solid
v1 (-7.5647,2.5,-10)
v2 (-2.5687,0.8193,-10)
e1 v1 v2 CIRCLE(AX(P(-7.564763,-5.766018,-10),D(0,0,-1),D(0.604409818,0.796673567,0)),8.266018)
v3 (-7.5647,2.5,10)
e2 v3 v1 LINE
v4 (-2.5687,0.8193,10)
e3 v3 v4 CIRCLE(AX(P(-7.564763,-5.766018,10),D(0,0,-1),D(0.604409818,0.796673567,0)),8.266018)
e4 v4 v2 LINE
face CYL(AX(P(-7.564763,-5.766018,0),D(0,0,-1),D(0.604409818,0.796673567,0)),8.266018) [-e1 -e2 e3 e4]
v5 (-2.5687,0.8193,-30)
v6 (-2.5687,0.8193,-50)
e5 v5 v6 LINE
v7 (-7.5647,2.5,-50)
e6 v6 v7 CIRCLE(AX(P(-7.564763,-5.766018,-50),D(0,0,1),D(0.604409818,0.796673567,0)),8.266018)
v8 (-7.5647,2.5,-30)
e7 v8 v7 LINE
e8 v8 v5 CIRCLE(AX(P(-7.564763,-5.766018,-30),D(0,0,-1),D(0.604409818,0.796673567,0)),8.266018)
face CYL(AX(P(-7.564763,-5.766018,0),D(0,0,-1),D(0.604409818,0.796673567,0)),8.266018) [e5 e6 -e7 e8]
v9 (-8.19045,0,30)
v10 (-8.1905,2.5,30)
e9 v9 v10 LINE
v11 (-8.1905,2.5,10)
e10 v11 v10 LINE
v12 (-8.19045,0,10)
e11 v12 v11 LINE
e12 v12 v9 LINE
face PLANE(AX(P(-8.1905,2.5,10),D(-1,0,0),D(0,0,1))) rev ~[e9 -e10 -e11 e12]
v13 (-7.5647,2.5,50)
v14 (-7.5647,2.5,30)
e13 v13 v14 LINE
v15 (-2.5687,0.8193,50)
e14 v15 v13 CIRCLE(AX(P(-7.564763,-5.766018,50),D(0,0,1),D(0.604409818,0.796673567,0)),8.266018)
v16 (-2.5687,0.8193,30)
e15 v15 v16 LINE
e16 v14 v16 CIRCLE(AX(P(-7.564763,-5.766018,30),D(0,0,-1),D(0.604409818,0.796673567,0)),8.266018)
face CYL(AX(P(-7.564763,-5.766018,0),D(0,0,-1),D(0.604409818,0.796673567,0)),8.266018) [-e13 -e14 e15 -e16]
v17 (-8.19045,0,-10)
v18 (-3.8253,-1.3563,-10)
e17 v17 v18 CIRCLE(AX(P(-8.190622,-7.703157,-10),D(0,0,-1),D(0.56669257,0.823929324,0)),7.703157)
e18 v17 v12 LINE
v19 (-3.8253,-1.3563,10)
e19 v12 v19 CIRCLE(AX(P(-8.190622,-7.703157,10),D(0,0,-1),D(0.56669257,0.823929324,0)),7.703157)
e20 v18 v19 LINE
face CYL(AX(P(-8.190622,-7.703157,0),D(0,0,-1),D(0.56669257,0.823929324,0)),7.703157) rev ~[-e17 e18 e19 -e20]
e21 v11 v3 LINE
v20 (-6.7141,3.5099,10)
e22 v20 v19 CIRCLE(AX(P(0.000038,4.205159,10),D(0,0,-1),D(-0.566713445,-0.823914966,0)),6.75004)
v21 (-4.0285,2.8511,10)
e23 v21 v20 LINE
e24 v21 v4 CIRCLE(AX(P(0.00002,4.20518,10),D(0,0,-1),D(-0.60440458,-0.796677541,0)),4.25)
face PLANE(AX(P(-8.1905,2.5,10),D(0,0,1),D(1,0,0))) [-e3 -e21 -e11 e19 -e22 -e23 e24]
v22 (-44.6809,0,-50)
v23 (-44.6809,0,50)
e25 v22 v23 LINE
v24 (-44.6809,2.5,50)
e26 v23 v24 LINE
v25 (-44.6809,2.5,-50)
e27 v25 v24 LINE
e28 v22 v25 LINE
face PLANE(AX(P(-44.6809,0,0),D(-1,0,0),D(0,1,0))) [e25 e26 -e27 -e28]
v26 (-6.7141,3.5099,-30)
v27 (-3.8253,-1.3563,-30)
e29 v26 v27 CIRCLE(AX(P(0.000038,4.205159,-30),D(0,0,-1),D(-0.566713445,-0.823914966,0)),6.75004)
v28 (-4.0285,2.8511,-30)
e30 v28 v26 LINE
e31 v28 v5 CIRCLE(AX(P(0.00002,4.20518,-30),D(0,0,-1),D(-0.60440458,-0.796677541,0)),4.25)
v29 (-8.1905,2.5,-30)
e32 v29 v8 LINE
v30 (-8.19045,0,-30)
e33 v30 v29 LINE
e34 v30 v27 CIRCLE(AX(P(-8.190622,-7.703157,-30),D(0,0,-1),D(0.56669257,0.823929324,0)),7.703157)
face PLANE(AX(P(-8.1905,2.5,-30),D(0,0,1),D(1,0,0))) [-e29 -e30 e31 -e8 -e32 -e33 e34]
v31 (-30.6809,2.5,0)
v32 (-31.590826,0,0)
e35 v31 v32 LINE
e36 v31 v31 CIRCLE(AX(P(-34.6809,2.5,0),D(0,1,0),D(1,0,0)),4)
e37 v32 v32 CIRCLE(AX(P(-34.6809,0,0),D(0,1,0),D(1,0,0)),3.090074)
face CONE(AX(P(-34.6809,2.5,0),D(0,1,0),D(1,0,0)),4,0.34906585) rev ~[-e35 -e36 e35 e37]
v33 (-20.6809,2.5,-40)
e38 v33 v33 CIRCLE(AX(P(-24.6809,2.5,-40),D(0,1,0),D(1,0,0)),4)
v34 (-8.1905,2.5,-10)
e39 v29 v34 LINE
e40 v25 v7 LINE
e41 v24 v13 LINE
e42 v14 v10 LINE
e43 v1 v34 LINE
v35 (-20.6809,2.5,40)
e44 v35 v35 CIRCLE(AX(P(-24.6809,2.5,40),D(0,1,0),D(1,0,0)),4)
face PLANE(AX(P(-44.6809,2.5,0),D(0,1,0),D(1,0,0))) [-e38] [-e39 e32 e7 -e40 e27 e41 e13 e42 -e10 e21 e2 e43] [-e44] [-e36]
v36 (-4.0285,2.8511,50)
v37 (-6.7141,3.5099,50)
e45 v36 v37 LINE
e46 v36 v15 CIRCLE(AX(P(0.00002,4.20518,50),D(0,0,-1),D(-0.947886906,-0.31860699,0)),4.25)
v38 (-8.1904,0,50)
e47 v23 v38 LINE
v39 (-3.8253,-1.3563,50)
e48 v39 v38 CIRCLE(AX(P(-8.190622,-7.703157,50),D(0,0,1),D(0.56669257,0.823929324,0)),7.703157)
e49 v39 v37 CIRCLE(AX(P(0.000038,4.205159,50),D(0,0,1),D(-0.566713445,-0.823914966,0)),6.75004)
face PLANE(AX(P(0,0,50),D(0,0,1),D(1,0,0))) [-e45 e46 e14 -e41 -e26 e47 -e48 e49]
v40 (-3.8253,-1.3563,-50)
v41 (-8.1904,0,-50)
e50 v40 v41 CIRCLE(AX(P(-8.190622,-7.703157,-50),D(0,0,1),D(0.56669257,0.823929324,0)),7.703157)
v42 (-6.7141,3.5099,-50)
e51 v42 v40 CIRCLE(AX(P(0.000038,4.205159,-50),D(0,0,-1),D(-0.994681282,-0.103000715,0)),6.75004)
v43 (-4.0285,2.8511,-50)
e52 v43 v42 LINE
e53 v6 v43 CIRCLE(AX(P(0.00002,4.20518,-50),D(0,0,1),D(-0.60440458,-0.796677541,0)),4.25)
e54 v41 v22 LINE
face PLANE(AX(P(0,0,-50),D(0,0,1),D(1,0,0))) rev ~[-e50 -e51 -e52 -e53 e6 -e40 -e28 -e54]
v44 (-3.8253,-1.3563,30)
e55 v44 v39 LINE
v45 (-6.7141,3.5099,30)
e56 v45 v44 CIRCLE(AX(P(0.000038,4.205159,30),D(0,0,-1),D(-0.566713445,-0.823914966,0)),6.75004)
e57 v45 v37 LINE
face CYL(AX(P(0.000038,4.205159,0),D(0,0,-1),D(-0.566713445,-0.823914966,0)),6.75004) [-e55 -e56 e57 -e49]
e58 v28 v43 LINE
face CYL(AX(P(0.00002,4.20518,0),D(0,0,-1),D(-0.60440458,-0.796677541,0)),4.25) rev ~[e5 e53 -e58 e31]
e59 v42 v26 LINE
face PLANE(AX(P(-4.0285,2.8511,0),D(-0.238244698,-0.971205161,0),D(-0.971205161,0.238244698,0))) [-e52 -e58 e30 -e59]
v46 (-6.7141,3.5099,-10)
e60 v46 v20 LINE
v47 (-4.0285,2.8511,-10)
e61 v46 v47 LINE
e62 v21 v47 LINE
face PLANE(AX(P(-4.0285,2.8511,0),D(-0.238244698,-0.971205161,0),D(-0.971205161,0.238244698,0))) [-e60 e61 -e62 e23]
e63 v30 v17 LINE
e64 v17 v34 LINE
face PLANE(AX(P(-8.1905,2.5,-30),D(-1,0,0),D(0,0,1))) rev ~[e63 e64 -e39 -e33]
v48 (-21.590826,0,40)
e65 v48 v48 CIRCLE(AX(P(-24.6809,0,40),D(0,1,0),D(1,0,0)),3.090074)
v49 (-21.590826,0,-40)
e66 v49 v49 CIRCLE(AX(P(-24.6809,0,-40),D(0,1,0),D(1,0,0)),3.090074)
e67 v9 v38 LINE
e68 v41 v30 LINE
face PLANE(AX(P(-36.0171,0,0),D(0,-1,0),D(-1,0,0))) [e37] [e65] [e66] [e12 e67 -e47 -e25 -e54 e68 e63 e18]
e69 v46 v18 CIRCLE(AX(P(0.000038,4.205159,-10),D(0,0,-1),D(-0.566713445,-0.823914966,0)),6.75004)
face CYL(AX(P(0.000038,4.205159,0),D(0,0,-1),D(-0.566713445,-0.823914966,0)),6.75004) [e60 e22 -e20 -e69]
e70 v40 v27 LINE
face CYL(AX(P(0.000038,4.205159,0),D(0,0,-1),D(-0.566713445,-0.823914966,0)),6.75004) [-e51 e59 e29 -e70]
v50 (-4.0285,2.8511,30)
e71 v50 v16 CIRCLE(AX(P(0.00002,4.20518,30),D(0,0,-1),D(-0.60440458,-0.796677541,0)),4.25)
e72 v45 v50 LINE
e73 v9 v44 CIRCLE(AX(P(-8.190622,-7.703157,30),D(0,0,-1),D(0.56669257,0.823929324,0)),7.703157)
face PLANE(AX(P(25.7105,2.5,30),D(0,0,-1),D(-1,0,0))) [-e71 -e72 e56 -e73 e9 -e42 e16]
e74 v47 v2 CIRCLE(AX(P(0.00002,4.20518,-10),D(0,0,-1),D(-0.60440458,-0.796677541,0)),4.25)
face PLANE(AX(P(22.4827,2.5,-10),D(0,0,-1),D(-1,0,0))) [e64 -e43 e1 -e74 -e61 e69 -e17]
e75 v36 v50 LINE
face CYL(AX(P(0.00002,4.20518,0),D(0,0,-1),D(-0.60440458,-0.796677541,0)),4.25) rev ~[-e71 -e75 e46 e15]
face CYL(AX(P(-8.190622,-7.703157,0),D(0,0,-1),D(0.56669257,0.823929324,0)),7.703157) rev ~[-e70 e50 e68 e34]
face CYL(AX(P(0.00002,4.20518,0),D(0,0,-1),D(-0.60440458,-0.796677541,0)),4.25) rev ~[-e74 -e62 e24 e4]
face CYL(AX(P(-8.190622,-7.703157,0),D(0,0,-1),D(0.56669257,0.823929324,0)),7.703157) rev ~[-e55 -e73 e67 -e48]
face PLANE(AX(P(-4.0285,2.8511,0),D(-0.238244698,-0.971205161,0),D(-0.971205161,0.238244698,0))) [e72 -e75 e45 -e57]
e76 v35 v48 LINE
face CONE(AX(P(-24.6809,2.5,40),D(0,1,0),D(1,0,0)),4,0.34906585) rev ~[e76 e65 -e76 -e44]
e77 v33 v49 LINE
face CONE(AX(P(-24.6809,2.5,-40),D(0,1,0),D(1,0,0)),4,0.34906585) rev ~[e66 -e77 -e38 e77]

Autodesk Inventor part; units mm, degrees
ref_plane "YZ Plane" through (0, 0, 0) normal (1, 0, 0) x (0, 1, 0)
ref_plane "XZ Plane" through (0, 0, 0) normal (0, 1, 0) x (-1, 0, 0)
ref_plane "XY Plane" through (0, 0, 0) normal (0, 0, 1) x (1, 0, 0)
sketch "Sketch1" plane through (0, 0, 0) normal (0, 0, 1) x (1, 0, 0)
  line L0 (-44.6809, 2.5) -> (-7.5647, 2.5)
  line L1 (-44.6809, 0) -> (-44.6809, 2.5)
  line L2 (0, 0) -> (0, 19.2246)
  arc A0 (-3.8253, -1.3563) -> (-6.7141, 3.5099) centre (0, 4.2052) ccw
  arc A1 (-2.5687, 0.8193) -> (-4.0285, 2.8511) centre (0, 4.2052) ccw
  arc A2 (-2.5687, 0.8193) -> (-7.5647, 2.5) centre (-7.5647, -5.7659) ccw
  line L3 (-4.0285, 2.8511) -> (-6.7141, 3.5099)
  arc A3 (-3.8253, -1.3563) -> (-8.1904, 0) centre (-8.1904, -7.7027) ccw
  line L4 (-8.1904, 0) -> (-44.6809, 0)
  line L5 (-36.0171, 0) -> (-5.5909, 0)
  line L6 (-5.2801, 0) -> (0, 0)
  point P0 (0, 10.9552)
  point P1 (0, 8.4552)
  dimension "d1" = 2.5
  dimension "d2" = 2.5
  dimension "d3" = 8.5
extrude "Extrusion1" add sketch "Sketch1" along normal mid plane 100 contours L0 A2 A1 L2 A0 A3 L4 L1 | A1 L3 A0 L2
sketch "Sketch2" plane through (-44.6809, 2.5, 50) normal (0, 1, 0) x (1, 0, 0)
  circle A0 centre (20, 90) radius 4
  circle A1 centre (10, 50) radius 4
  circle A2 centre (20, 10) radius 4
  line L0 (0, 100) -> (37.1161, 100) projected
  line L1 (0, 100) -> (0, 0) projected
  line L2 (37.1161, 0) -> (0, 0) projected
  point P0 (44.6809, 50)
  dimension "d6" = 8
  dimension "d7" = 8
  dimension "d8" = 8
  dimension "d9" = 10
  dimension "d10" = 20
  dimension "d11" = 20
  dimension "d12" = 10
  dimension "d13" = 10
  dimension "d14" = 50
extrude "Extrusion2" cut sketch "Sketch2" against normal up to next draft -20
sketch "Sketch4" plane through (-44.6809, 2.5, 50) normal (0, 1, 0) x (1, 0, 0)
  line L0 (36.4904, 100) -> (36.4904, 0) projected
  line L1 (36.4904, 80) -> (67.1636, 80)
  line L2 (67.1636, 80) -> (67.1636, 60)
  line L3 (67.1636, 60) -> (36.4904, 60)
  line L4 (36.4904, 60) -> (36.4904, 80)
  line L5 (36.4904, 40) -> (70.3914, 40)
  line L6 (70.3914, 40) -> (70.3914, 20)
  line L7 (70.3914, 20) -> (36.4904, 20)
  line L8 (36.4904, 20) -> (36.4904, 40)
  line L9 (37.1161, 0) -> (0, 0) projected
  line L10 (51.4309, 100) -> (37.9309, 100) projected
  point P0 (44.6809, 50)
  point P1 (37.9668, 100)
  point P2 (40.8556, 100)
  dimension "d22" = 20
  dimension "d23" = 20
  dimension "d24" = 20
  dimension "d25" = 20
extrude "Extrusion3" cut sketch "Sketch4" against normal mid plane 100
properties part number "Hinge1" material "Stainless Steel"
